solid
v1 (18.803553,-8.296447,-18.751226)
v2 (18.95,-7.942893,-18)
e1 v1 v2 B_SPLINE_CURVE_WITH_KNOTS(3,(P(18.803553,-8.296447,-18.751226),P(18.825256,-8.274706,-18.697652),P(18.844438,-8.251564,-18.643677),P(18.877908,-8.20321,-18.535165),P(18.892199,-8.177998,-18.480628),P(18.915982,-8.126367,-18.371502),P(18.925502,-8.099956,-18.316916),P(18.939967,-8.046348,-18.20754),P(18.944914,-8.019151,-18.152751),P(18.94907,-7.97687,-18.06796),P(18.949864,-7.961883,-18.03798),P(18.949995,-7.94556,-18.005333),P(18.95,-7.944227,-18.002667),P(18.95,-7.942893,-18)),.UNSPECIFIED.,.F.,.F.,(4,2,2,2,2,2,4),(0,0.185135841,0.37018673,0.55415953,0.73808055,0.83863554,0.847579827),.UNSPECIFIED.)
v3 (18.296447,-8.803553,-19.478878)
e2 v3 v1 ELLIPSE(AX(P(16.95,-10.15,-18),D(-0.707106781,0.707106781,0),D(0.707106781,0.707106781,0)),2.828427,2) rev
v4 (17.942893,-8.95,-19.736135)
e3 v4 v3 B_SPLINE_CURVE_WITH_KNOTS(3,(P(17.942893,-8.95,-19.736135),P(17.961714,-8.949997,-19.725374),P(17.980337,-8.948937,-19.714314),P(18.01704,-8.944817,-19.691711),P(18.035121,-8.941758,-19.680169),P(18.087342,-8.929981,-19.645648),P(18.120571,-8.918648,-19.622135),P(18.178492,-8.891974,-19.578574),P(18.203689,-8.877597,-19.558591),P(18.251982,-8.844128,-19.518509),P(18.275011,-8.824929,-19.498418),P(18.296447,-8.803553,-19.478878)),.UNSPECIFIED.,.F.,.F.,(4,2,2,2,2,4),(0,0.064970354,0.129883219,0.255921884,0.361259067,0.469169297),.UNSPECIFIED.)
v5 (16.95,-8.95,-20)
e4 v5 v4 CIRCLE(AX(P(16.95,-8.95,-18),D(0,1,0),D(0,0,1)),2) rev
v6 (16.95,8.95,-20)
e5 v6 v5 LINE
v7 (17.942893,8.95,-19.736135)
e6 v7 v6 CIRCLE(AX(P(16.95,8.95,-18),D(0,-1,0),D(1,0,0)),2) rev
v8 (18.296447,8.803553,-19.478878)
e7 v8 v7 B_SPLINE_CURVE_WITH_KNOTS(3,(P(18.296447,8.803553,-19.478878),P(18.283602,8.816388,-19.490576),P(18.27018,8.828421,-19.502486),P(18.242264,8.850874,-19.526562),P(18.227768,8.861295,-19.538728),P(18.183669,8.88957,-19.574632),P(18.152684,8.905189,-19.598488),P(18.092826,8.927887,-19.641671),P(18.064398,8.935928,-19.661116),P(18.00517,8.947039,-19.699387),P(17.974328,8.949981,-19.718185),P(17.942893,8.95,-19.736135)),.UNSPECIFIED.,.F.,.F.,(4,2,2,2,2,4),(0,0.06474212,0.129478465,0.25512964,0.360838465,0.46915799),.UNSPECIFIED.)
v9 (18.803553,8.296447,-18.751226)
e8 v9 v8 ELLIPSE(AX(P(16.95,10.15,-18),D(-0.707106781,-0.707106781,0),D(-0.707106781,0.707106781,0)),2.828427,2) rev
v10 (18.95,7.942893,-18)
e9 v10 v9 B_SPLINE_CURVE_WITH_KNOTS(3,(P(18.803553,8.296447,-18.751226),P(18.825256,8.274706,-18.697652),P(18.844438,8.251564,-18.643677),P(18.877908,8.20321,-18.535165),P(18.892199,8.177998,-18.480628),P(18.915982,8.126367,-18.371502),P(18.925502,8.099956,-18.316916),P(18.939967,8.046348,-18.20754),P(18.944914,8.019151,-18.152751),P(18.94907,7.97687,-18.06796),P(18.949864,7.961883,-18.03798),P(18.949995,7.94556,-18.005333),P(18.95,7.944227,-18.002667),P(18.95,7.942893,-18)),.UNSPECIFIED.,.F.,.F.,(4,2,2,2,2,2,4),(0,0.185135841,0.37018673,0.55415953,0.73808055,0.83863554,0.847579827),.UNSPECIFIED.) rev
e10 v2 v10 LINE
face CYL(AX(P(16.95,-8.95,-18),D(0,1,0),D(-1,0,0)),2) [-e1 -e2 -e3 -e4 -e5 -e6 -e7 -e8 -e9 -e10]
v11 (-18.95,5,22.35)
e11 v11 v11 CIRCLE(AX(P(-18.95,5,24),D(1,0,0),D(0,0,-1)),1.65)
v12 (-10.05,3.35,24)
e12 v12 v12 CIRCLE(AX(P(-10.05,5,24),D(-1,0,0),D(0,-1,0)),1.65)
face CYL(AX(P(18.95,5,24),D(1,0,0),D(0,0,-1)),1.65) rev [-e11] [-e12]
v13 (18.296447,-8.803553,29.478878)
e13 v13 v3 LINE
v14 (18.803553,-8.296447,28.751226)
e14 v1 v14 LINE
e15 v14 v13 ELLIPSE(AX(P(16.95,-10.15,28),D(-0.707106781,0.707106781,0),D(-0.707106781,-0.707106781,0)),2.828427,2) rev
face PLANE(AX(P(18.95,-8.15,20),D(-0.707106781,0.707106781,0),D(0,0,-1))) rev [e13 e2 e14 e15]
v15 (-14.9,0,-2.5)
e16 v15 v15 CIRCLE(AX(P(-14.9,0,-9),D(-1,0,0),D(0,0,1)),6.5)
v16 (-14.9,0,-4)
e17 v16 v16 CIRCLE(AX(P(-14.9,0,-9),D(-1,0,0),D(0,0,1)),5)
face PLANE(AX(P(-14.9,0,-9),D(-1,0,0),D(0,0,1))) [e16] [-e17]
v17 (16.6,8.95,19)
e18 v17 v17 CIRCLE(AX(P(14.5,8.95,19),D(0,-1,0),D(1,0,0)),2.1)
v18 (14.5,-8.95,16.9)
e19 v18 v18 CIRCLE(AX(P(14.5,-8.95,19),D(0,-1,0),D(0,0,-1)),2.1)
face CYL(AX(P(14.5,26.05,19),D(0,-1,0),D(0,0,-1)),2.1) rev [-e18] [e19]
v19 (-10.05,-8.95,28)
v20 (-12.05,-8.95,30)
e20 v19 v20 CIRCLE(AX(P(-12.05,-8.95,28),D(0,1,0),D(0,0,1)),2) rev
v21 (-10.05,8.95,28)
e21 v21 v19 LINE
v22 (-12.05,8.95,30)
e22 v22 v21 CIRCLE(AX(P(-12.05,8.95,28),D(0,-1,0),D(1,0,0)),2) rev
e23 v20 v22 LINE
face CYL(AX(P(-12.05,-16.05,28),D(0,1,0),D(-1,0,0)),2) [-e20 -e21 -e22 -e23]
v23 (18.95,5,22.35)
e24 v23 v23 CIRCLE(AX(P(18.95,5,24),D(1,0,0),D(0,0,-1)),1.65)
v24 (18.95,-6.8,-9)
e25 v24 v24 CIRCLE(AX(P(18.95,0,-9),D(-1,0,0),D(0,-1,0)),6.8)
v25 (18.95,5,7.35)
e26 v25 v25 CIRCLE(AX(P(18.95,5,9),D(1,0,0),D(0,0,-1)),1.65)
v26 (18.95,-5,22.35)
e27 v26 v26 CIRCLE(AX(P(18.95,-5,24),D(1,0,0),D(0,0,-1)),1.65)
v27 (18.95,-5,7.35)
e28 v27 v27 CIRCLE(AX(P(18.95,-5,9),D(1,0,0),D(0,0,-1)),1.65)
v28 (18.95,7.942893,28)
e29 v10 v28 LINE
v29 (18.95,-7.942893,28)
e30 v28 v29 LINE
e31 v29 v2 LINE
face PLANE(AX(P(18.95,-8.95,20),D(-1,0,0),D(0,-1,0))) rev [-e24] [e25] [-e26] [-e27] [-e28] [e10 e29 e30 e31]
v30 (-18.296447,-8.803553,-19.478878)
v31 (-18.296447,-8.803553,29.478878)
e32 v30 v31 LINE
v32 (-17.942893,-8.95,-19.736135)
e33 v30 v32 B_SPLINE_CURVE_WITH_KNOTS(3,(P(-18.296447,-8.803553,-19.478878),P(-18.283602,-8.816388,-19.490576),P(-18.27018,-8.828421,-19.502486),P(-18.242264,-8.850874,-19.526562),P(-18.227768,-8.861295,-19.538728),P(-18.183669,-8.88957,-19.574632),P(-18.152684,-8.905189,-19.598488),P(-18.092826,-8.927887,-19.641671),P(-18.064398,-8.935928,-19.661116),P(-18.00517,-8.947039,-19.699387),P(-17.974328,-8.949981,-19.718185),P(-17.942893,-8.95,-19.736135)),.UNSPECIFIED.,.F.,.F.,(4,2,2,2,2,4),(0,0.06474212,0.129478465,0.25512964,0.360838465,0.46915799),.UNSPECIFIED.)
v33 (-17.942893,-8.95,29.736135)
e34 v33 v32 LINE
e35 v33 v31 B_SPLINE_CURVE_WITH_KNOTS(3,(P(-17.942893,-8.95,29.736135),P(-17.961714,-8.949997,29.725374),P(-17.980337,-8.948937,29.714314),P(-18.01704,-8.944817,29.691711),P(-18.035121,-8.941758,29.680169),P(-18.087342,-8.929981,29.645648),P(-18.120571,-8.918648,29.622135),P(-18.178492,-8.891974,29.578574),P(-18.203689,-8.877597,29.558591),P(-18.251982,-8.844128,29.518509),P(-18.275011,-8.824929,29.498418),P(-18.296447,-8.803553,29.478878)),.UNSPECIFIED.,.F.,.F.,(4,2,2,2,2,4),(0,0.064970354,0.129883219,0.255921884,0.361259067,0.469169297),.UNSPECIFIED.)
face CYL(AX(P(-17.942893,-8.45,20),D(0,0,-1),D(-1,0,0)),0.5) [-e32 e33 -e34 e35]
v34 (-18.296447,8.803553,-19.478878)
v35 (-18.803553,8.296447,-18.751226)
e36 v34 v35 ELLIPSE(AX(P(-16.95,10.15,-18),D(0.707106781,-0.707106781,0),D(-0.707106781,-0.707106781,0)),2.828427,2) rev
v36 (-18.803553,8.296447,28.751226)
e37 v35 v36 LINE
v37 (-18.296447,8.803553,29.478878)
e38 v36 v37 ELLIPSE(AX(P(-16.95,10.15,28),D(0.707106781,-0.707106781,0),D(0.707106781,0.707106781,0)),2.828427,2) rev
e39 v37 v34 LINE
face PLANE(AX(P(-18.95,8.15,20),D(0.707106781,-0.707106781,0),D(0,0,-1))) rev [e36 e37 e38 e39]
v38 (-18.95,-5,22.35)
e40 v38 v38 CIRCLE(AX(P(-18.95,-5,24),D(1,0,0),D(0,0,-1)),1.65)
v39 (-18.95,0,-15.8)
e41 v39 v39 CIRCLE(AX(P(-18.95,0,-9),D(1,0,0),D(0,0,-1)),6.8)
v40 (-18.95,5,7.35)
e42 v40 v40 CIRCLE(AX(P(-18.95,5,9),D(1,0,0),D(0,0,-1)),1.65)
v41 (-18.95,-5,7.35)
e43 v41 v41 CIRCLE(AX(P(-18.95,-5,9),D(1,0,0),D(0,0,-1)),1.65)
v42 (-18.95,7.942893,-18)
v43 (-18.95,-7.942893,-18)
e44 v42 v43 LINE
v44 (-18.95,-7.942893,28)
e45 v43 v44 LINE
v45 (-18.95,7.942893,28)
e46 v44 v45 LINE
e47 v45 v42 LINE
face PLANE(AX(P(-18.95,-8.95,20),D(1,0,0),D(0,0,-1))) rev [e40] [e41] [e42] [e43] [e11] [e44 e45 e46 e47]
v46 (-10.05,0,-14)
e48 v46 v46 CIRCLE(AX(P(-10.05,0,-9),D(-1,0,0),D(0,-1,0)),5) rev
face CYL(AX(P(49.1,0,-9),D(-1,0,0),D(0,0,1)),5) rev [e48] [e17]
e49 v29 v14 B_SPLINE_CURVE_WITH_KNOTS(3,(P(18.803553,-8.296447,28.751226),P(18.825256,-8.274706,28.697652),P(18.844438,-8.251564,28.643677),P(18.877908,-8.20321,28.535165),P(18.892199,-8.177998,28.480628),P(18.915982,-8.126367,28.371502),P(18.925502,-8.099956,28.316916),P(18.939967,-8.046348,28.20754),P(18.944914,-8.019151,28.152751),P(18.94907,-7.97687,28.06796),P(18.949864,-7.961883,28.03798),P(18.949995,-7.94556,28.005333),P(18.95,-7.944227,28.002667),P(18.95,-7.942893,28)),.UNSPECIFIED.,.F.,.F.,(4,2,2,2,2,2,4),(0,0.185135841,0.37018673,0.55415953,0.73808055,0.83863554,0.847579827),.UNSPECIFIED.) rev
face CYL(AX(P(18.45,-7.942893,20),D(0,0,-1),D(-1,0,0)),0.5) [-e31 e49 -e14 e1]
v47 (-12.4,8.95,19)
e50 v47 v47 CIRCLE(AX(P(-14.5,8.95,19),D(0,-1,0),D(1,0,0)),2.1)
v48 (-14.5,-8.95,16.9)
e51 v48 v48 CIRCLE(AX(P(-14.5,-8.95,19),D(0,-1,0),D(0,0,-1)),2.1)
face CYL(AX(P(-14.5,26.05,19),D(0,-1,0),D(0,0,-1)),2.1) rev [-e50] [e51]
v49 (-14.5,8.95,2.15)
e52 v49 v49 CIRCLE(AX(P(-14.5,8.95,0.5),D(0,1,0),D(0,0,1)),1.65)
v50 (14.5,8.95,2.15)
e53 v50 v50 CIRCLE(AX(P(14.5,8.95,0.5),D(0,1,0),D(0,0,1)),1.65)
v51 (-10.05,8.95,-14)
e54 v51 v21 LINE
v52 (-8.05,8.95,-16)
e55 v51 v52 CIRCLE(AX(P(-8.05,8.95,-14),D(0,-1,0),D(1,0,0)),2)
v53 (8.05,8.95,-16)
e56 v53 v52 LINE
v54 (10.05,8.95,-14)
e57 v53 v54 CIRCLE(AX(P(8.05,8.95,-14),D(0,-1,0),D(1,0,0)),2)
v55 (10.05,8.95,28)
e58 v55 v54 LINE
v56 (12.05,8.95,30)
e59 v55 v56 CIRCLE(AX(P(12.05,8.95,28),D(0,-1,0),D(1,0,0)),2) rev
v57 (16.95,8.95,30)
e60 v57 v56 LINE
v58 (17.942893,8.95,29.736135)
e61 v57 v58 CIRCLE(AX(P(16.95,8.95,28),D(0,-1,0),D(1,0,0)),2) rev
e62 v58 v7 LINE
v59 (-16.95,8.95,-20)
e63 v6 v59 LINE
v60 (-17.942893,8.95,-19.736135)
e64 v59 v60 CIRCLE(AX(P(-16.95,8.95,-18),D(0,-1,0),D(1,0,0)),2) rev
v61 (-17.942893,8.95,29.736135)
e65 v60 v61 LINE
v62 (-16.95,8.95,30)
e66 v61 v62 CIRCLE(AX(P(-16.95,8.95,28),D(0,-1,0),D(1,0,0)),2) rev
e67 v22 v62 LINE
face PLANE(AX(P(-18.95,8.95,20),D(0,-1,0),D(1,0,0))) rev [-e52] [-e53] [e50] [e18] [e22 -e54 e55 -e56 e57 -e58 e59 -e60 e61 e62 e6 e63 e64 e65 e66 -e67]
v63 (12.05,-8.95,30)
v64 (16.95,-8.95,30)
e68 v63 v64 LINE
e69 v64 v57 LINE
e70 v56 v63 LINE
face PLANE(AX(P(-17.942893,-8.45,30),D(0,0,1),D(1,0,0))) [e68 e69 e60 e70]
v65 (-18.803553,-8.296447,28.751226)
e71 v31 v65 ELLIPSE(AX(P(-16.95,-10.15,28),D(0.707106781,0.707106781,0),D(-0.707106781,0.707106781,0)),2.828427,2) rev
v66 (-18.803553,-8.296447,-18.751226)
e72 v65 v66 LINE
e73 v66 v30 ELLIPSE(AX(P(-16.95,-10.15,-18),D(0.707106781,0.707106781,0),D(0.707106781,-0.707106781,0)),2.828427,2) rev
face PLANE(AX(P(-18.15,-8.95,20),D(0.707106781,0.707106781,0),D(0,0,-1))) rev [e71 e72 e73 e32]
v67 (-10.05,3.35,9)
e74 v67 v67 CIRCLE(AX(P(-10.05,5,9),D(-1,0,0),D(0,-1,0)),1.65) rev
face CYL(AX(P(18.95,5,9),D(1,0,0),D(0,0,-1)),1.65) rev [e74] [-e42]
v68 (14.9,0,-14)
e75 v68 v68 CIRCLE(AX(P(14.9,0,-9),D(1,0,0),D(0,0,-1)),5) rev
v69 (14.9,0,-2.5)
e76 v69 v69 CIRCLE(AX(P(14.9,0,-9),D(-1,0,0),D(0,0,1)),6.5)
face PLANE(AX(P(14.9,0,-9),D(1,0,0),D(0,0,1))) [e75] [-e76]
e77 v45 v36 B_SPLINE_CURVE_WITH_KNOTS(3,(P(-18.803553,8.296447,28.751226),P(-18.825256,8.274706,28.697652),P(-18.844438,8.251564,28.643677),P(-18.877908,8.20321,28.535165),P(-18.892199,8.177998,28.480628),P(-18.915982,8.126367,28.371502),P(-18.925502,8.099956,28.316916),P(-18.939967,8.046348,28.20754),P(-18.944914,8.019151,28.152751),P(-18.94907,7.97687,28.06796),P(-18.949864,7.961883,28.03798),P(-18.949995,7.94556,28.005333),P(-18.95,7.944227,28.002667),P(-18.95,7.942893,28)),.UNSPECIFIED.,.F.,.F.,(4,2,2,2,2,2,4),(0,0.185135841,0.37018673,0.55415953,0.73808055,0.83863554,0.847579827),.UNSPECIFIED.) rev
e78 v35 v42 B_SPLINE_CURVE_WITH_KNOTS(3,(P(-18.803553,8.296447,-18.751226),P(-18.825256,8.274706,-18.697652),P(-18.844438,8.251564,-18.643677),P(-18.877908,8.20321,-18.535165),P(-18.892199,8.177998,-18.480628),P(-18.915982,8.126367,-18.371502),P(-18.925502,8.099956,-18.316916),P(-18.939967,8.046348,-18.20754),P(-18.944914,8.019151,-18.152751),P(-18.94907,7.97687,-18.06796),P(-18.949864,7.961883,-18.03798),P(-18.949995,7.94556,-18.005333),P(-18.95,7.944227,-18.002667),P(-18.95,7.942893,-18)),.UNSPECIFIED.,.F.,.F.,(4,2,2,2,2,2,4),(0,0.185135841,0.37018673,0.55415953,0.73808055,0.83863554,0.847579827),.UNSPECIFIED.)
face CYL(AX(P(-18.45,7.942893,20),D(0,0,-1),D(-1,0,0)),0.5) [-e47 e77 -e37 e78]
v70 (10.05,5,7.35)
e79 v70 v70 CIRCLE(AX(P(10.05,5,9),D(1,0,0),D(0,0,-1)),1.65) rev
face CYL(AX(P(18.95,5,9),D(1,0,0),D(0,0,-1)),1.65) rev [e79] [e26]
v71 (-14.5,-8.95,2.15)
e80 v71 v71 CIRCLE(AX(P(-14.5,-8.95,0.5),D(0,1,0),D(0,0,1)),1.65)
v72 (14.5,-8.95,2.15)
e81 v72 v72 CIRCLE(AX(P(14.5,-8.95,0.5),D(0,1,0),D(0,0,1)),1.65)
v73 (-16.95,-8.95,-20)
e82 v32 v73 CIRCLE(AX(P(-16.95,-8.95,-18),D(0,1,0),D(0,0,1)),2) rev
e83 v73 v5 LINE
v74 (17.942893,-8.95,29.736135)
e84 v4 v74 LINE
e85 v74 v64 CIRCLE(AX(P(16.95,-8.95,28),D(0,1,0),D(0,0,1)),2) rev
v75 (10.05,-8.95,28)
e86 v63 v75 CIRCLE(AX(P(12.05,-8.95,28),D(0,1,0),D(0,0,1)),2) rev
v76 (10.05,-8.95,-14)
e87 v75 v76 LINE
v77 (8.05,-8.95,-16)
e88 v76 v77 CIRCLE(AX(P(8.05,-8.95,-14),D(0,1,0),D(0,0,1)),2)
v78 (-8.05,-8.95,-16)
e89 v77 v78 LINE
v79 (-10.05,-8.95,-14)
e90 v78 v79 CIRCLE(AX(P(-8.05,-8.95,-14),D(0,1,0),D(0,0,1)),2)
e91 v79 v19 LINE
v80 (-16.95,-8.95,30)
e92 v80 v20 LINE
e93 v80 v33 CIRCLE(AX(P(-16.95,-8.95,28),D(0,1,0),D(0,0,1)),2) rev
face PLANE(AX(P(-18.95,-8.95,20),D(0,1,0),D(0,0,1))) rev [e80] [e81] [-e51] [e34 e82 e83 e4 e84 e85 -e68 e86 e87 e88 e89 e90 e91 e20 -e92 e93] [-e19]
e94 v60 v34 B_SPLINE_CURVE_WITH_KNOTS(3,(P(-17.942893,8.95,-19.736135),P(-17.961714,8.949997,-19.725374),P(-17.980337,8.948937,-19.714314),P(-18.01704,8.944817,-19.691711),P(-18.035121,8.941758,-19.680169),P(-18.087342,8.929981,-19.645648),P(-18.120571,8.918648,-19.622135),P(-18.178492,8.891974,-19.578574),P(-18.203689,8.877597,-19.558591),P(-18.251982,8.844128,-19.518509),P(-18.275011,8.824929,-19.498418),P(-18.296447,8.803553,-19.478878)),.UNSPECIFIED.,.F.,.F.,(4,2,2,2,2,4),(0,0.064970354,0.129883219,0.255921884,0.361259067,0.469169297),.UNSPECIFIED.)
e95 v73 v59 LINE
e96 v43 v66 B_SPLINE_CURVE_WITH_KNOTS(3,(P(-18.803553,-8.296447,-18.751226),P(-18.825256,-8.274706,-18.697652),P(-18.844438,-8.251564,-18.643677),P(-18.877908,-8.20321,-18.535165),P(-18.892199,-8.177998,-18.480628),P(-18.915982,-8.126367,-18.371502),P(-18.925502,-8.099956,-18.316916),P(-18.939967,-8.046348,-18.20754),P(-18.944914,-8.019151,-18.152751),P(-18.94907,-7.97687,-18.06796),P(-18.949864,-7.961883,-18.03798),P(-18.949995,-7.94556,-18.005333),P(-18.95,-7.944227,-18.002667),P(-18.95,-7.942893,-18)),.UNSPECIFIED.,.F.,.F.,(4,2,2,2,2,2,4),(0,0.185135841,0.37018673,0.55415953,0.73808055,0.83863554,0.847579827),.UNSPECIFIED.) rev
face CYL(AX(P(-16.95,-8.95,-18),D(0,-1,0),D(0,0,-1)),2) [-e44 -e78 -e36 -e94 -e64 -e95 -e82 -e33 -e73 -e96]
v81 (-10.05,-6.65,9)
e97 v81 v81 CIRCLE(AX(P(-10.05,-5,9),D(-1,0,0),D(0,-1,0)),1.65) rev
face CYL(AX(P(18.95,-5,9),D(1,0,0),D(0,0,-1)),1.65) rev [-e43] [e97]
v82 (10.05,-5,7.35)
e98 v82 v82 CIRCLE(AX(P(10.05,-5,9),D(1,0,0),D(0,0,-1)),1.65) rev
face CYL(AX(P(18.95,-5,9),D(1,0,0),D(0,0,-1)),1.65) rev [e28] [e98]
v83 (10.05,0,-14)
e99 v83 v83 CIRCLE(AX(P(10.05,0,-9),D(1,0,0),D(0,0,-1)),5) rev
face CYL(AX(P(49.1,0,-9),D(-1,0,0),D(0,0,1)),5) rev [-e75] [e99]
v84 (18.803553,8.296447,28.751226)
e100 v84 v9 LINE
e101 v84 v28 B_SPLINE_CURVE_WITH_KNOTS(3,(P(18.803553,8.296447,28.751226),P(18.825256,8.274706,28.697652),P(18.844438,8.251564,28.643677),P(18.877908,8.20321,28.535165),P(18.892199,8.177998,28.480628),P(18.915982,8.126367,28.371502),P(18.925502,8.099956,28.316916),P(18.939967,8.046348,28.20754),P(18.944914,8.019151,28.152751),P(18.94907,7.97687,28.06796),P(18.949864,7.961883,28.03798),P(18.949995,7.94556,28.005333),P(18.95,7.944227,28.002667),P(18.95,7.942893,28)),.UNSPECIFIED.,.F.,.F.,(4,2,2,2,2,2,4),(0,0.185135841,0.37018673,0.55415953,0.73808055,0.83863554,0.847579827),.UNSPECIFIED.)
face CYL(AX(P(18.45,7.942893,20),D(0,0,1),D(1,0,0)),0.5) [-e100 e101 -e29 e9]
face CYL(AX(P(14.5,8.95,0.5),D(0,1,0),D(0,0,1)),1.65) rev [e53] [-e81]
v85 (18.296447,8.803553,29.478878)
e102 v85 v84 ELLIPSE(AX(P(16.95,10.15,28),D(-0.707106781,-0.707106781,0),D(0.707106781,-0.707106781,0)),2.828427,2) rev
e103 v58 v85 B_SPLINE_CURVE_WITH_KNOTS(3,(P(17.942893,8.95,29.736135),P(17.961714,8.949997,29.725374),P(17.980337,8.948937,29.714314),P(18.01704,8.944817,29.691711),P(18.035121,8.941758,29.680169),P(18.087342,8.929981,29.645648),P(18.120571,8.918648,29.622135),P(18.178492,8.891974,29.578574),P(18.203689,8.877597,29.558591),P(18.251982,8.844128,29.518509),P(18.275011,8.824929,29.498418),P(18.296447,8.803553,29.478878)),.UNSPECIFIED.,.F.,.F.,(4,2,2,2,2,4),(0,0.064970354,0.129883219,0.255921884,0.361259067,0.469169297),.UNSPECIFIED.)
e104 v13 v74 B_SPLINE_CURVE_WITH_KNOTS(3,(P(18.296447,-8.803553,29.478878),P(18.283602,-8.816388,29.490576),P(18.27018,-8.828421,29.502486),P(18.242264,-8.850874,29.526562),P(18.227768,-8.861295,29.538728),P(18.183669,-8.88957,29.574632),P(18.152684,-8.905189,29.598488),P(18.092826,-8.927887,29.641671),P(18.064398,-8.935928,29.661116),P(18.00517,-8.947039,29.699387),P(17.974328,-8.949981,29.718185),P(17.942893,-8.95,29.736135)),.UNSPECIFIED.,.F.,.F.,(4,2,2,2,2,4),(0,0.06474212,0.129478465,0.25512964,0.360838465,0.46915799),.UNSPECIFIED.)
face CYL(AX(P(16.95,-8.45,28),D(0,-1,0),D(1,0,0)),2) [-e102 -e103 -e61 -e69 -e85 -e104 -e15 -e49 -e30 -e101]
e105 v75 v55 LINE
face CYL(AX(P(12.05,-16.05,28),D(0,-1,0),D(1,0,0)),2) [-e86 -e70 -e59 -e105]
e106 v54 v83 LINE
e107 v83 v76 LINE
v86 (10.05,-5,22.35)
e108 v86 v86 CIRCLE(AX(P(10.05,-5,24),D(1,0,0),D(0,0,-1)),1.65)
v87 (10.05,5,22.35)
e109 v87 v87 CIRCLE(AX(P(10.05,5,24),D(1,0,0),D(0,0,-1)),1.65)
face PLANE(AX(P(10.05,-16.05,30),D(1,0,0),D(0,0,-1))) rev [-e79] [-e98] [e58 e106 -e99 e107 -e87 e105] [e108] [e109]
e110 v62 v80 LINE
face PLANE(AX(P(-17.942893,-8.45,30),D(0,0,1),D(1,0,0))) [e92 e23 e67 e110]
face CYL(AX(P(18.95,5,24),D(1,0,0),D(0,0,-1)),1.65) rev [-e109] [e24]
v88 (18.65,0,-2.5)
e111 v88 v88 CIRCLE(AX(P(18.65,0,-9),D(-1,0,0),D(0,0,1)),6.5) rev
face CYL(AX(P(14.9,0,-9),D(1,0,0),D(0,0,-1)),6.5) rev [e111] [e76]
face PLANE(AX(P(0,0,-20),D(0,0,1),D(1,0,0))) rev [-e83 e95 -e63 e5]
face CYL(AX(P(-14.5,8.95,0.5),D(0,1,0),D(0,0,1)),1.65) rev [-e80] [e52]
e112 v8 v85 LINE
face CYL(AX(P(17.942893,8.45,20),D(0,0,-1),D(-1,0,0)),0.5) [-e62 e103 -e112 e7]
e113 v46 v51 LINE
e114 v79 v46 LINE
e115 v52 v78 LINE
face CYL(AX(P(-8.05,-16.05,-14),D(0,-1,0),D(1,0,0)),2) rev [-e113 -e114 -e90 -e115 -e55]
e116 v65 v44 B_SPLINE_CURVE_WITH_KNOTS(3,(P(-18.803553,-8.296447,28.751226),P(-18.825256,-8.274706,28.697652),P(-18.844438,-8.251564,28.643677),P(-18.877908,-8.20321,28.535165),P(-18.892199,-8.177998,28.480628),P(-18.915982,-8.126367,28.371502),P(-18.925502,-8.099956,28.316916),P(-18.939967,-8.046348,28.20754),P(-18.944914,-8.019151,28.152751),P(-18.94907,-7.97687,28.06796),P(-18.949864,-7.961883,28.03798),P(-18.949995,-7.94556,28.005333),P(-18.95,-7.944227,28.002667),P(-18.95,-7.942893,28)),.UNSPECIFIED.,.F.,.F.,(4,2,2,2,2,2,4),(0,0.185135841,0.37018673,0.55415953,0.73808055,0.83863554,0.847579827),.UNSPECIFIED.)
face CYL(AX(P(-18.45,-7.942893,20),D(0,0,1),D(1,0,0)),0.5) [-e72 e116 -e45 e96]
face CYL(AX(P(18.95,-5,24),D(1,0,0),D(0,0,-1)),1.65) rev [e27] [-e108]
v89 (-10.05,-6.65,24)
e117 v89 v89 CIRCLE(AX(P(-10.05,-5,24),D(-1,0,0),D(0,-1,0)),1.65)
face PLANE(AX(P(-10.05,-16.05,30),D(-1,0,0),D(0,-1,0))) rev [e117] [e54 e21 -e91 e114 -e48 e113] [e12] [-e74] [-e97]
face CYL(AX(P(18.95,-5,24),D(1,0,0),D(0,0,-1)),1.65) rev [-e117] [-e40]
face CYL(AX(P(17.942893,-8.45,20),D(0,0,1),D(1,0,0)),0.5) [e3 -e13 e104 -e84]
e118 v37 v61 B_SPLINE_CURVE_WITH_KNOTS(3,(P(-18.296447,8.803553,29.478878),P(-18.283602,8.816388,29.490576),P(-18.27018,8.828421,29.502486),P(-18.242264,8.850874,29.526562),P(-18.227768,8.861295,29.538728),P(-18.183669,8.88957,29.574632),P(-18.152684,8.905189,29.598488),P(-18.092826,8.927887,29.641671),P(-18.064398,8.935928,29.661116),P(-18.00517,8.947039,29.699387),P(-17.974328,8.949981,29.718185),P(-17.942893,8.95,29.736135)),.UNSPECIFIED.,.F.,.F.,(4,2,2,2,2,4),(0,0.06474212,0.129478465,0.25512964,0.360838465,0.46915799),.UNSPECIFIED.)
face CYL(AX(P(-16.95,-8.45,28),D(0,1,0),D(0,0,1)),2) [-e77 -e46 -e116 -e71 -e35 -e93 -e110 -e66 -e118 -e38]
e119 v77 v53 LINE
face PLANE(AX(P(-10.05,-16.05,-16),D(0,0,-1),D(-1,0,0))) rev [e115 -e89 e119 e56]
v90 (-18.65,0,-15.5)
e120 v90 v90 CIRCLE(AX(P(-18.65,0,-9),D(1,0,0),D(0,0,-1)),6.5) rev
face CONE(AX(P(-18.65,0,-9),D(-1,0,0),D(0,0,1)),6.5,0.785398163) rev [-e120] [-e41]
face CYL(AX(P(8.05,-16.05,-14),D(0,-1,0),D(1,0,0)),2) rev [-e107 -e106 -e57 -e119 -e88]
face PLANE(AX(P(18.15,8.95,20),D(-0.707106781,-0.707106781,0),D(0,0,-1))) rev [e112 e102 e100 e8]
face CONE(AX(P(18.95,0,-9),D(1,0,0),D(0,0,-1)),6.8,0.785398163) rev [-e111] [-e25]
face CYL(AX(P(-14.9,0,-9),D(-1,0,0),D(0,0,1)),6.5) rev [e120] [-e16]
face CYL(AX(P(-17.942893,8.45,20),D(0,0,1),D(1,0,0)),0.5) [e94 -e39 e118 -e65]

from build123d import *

# Parameters (mm, degrees)
SKETCH_1_W             = 37.9
SKETCH_1_H             = 17.9
EXTRUDE_1_DEPTH        = 20
CHAMFER_1_SIZE         = 0.8
FILLET_1_R             = 0.5
SKETCH_2_R             = 6.5
CUT_EXTRUDE_1_DEPTH    = 4.05
SKETCH_3_R             = 5
CUT_EXTRUDE_2_DEPTH    = 64
CHAMFER_2_SIZE         = 0.3
HOLE_WIZARD_M4_1_D     = 3.3
HOLE_WIZARD_M4_1_DEPTH = 20
HOLE_WIZARD_M4_1_TIP   = 0.991420021
HOLE_WIZARD_M4_2_D     = 3.3
HOLE_WIZARD_M4_2_DEPTH = 42.1
HOLE_WIZARD_M4_2_TIP   = 0.991420021
EXTRUDE_2_DEPTH        = 10
SKETCH_17_W            = 20.1
SKETCH_17_H            = 46
CUT_EXTRUDE_5_DEPTH    = 25
FILLET_2_R             = 2
SKETCH_18_R            = 2.1
CUT_EXTRUDE_6_DEPTH    = 35
FILLET_4_R             = 2
HOLE_WIZARD_M4_4_D     = 3.3
HOLE_WIZARD_M4_4_DEPTH = 42.1
HOLE_WIZARD_M4_4_TIP   = 0.991420021


# Some blends are built 0.0001 mm under size
with BuildPart() as part:
    # 草图1 → 凸台-拉伸1 (new, symmetric)
    with BuildSketch(Plane.XY):
        Rectangle(SKETCH_1_W, SKETCH_1_H)
    extrude(amount=EXTRUDE_1_DEPTH, both=True)

    # 倒角1
    chamfer_1_edges = [part.edges().sort_by_distance(p)[0] for p in [
        (-18.95, -8.95, 0),
        (-18.95, 8.95, 0),
        (18.95, 8.95, 0),
        (18.95, -8.95, 0),
    ]]
    chamfer(chamfer_1_edges, length=CHAMFER_1_SIZE)

    # 圆角1
    fillet_1_edges = [part.edges().sort_by_distance(p)[0] for p in [
        (18.15, -8.95, 0),
        (-18.15, -8.95, 0),
        (-18.95, 8.15, 0),
        (-18.95, -8.15, 0),
        (18.95, 8.15, 0),
        (18.95, -8.15, 0),
        (18.15, 8.95, 0),
        (-18.15, 8.95, 0),
    ]]
    fillet(fillet_1_edges, radius=FILLET_1_R)

    # 草图2 → 切除-拉伸1 (cut)
    with BuildSketch(Plane.ZY.offset(18.95)):
        with Locations((-9, 0)):
            Circle(SKETCH_2_R)
    cut_extrude_1 = extrude(amount=-CUT_EXTRUDE_1_DEPTH, mode=Mode.SUBTRACT)

    # 草图3 → 切除-拉伸2 (cut)
    with BuildSketch(Plane.ZY.offset(14.9)):
        with Locations((-9, 0)):
            Circle(SKETCH_3_R)
    extrude(amount=-CUT_EXTRUDE_2_DEPTH, mode=Mode.SUBTRACT)

    # 镜向1: 切除-拉伸1 across plane
    add(cut_extrude_1.mirror(Plane(origin=(0, 0, 0), x_dir=(0, 0, 1), z_dir=(1, 0, 0))), mode=Mode.SUBTRACT)

    # 倒角2
    chamfer_2_edges = [part.edges().sort_by_distance(p)[0] for p in [
        (-18.95, 0, -15.5),
        (18.95, 0, -15.5),
    ]]
    chamfer(chamfer_2_edges, length=CHAMFER_2_SIZE)

    # M4 螺纹孔1
    with Locations(Plane(origin=(0, 8.95, 0), x_dir=(1, 0, 0), z_dir=(0, 1, 0))):
        with Locations((-14.5, -0.5), (14.5, -0.5)):
            Hole(HOLE_WIZARD_M4_1_D / 2, depth=HOLE_WIZARD_M4_1_DEPTH)
            with Locations((0, 0, -(HOLE_WIZARD_M4_1_DEPTH + HOLE_WIZARD_M4_1_TIP / 2))):  # 118° drill point
                Cone(0, HOLE_WIZARD_M4_1_D / 2, HOLE_WIZARD_M4_1_TIP, mode=Mode.SUBTRACT)

    # M4 螺纹孔2
    with Locations(Plane(origin=(18.95, 0, 0), x_dir=(0, 0, -1), z_dir=(1, 0, 0))):
        with Locations((-9, 5), (-9, -5)):
            Hole(HOLE_WIZARD_M4_2_D / 2, depth=HOLE_WIZARD_M4_2_DEPTH)
            with Locations((0, 0, -(HOLE_WIZARD_M4_2_DEPTH + HOLE_WIZARD_M4_2_TIP / 2))):  # 118° drill point
                Cone(0, HOLE_WIZARD_M4_2_D / 2, HOLE_WIZARD_M4_2_TIP, mode=Mode.SUBTRACT)

    # 草图13 → 凸台-拉伸2 (add)
    with BuildSketch(Plane.XY.offset(20)):
        with BuildLine():
            Line((-17.942893219, -8.95), (17.942893219, -8.95))
            ThreePointArc((17.942893219, -8.95), (18.134234935, -8.911939766), (18.296446609, -8.803553391))
            Line((18.296446609, -8.803553391), (18.803553391, -8.296446609))
            ThreePointArc((18.803553391, -8.296446609), (18.911939766, -8.134234935), (18.95, -7.942893219))
            Line((18.95, -7.942893219), (18.95, 7.942893219))
            ThreePointArc((18.95, 7.942893219), (18.911939766, 8.134234935), (18.803553391, 8.296446609))
            Line((18.803553391, 8.296446609), (18.296446609, 8.803553391))
            ThreePointArc((18.296446609, 8.803553391), (18.134234935, 8.911939766), (17.942893219, 8.95))
            Line((17.942893219, 8.95), (-17.942893219, 8.95))
            ThreePointArc((-17.942893219, 8.95), (-18.134234935, 8.911939766), (-18.296446609, 8.803553391))
            Line((-18.296446609, 8.803553391), (-18.803553391, 8.296446609))
            ThreePointArc((-18.803553391, 8.296446609), (-18.911939766, 8.134234935), (-18.95, 7.942893219))
            Line((-18.95, 7.942893219), (-18.95, -7.942893219))
            ThreePointArc((-18.95, -7.942893219), (-18.911939766, -8.134234935), (-18.803553391, -8.296446609))
            Line((-18.803553391, -8.296446609), (-18.296446609, -8.803553391))
            ThreePointArc((-18.296446609, -8.803553391), (-18.134234935, -8.911939766), (-17.942893219, -8.95))
        make_face()
    extrude(amount=EXTRUDE_2_DEPTH)

    # 草图17 → 切除-拉伸5 (cut)
    with BuildSketch(Plane(origin=(0, 8.95, 0), x_dir=(1, 0, 0), z_dir=(0, 1, 0))):
        with Locations((0, -7)):
            Rectangle(SKETCH_17_W, SKETCH_17_H)
    extrude(amount=-CUT_EXTRUDE_5_DEPTH, mode=Mode.SUBTRACT)

    # 圆角2
    fillet_2_edges = [part.edges().sort_by_distance(p)[0] for p in [
        (-10.05, 0, -16),
        (10.05, 0, -16),
    ]]
    fillet(fillet_2_edges, radius=FILLET_2_R - 0.0001)  # a hair under: the kernel refuses the full size
    fillet_2_2_edges = [part.edges().sort_by_distance(p)[0] for p in [
        (10.05, 0, 30),
        (-10.05, 0, 30),
    ]]
    fillet(fillet_2_2_edges, radius=FILLET_2_R)

    # 草图18 → 切除-拉伸6 (cut)
    with BuildSketch(Plane.XZ.offset(8.95)):
        with Locations(Location((-14.5, 19, 0), (0, 0, 270))):
            Circle(SKETCH_18_R)
        with Locations(Location((14.5, 19, 0), (0, 0, 270))):
            Circle(SKETCH_18_R)
    extrude(amount=-CUT_EXTRUDE_6_DEPTH, mode=Mode.SUBTRACT)

    # 圆角4
    # the kernel refuses this fillet: 2 mm, written as the material it takes off along each edge
    with BuildSketch(Plane(origin=(-18.95, -12.942893219, -20), x_dir=(1, 0, 0), z_dir=(0, 1, 0)), Plane(origin=(18.95, 12.942893219, -20), x_dir=(-1, 0, 0), z_dir=(0, -1, 0)), Plane(origin=(18.95, -12.942893219, 30), x_dir=(-1, 0, 0), z_dir=(0, 1, 0)), Plane(origin=(-18.95, 12.942893219, 30), x_dir=(1, 0, 0), z_dir=(0, -1, 0))) as fillet_4_piece_1:
        with BuildLine():
            CenterArc((FILLET_4_R, -FILLET_4_R), FILLET_4_R, 90, 90)
            Line((0, -FILLET_4_R), (0, 0))
            Line((0, 0), (FILLET_4_R, 0))
        make_face()
    extrude(amount=25.885786438, mode=Mode.SUBTRACT)

    # M4 螺纹孔4
    with Locations(Plane(origin=(18.95, 0, 0), x_dir=(0, 0, -1), z_dir=(1, 0, 0))):
        with Locations((-24, 5), (-24, -5)):
            Hole(HOLE_WIZARD_M4_4_D / 2, depth=HOLE_WIZARD_M4_4_DEPTH)
            with Locations((0, 0, -(HOLE_WIZARD_M4_4_DEPTH + HOLE_WIZARD_M4_4_TIP / 2))):  # 118° drill point
                Cone(0, HOLE_WIZARD_M4_4_D / 2, HOLE_WIZARD_M4_4_TIP, mode=Mode.SUBTRACT)


solid = part.part
